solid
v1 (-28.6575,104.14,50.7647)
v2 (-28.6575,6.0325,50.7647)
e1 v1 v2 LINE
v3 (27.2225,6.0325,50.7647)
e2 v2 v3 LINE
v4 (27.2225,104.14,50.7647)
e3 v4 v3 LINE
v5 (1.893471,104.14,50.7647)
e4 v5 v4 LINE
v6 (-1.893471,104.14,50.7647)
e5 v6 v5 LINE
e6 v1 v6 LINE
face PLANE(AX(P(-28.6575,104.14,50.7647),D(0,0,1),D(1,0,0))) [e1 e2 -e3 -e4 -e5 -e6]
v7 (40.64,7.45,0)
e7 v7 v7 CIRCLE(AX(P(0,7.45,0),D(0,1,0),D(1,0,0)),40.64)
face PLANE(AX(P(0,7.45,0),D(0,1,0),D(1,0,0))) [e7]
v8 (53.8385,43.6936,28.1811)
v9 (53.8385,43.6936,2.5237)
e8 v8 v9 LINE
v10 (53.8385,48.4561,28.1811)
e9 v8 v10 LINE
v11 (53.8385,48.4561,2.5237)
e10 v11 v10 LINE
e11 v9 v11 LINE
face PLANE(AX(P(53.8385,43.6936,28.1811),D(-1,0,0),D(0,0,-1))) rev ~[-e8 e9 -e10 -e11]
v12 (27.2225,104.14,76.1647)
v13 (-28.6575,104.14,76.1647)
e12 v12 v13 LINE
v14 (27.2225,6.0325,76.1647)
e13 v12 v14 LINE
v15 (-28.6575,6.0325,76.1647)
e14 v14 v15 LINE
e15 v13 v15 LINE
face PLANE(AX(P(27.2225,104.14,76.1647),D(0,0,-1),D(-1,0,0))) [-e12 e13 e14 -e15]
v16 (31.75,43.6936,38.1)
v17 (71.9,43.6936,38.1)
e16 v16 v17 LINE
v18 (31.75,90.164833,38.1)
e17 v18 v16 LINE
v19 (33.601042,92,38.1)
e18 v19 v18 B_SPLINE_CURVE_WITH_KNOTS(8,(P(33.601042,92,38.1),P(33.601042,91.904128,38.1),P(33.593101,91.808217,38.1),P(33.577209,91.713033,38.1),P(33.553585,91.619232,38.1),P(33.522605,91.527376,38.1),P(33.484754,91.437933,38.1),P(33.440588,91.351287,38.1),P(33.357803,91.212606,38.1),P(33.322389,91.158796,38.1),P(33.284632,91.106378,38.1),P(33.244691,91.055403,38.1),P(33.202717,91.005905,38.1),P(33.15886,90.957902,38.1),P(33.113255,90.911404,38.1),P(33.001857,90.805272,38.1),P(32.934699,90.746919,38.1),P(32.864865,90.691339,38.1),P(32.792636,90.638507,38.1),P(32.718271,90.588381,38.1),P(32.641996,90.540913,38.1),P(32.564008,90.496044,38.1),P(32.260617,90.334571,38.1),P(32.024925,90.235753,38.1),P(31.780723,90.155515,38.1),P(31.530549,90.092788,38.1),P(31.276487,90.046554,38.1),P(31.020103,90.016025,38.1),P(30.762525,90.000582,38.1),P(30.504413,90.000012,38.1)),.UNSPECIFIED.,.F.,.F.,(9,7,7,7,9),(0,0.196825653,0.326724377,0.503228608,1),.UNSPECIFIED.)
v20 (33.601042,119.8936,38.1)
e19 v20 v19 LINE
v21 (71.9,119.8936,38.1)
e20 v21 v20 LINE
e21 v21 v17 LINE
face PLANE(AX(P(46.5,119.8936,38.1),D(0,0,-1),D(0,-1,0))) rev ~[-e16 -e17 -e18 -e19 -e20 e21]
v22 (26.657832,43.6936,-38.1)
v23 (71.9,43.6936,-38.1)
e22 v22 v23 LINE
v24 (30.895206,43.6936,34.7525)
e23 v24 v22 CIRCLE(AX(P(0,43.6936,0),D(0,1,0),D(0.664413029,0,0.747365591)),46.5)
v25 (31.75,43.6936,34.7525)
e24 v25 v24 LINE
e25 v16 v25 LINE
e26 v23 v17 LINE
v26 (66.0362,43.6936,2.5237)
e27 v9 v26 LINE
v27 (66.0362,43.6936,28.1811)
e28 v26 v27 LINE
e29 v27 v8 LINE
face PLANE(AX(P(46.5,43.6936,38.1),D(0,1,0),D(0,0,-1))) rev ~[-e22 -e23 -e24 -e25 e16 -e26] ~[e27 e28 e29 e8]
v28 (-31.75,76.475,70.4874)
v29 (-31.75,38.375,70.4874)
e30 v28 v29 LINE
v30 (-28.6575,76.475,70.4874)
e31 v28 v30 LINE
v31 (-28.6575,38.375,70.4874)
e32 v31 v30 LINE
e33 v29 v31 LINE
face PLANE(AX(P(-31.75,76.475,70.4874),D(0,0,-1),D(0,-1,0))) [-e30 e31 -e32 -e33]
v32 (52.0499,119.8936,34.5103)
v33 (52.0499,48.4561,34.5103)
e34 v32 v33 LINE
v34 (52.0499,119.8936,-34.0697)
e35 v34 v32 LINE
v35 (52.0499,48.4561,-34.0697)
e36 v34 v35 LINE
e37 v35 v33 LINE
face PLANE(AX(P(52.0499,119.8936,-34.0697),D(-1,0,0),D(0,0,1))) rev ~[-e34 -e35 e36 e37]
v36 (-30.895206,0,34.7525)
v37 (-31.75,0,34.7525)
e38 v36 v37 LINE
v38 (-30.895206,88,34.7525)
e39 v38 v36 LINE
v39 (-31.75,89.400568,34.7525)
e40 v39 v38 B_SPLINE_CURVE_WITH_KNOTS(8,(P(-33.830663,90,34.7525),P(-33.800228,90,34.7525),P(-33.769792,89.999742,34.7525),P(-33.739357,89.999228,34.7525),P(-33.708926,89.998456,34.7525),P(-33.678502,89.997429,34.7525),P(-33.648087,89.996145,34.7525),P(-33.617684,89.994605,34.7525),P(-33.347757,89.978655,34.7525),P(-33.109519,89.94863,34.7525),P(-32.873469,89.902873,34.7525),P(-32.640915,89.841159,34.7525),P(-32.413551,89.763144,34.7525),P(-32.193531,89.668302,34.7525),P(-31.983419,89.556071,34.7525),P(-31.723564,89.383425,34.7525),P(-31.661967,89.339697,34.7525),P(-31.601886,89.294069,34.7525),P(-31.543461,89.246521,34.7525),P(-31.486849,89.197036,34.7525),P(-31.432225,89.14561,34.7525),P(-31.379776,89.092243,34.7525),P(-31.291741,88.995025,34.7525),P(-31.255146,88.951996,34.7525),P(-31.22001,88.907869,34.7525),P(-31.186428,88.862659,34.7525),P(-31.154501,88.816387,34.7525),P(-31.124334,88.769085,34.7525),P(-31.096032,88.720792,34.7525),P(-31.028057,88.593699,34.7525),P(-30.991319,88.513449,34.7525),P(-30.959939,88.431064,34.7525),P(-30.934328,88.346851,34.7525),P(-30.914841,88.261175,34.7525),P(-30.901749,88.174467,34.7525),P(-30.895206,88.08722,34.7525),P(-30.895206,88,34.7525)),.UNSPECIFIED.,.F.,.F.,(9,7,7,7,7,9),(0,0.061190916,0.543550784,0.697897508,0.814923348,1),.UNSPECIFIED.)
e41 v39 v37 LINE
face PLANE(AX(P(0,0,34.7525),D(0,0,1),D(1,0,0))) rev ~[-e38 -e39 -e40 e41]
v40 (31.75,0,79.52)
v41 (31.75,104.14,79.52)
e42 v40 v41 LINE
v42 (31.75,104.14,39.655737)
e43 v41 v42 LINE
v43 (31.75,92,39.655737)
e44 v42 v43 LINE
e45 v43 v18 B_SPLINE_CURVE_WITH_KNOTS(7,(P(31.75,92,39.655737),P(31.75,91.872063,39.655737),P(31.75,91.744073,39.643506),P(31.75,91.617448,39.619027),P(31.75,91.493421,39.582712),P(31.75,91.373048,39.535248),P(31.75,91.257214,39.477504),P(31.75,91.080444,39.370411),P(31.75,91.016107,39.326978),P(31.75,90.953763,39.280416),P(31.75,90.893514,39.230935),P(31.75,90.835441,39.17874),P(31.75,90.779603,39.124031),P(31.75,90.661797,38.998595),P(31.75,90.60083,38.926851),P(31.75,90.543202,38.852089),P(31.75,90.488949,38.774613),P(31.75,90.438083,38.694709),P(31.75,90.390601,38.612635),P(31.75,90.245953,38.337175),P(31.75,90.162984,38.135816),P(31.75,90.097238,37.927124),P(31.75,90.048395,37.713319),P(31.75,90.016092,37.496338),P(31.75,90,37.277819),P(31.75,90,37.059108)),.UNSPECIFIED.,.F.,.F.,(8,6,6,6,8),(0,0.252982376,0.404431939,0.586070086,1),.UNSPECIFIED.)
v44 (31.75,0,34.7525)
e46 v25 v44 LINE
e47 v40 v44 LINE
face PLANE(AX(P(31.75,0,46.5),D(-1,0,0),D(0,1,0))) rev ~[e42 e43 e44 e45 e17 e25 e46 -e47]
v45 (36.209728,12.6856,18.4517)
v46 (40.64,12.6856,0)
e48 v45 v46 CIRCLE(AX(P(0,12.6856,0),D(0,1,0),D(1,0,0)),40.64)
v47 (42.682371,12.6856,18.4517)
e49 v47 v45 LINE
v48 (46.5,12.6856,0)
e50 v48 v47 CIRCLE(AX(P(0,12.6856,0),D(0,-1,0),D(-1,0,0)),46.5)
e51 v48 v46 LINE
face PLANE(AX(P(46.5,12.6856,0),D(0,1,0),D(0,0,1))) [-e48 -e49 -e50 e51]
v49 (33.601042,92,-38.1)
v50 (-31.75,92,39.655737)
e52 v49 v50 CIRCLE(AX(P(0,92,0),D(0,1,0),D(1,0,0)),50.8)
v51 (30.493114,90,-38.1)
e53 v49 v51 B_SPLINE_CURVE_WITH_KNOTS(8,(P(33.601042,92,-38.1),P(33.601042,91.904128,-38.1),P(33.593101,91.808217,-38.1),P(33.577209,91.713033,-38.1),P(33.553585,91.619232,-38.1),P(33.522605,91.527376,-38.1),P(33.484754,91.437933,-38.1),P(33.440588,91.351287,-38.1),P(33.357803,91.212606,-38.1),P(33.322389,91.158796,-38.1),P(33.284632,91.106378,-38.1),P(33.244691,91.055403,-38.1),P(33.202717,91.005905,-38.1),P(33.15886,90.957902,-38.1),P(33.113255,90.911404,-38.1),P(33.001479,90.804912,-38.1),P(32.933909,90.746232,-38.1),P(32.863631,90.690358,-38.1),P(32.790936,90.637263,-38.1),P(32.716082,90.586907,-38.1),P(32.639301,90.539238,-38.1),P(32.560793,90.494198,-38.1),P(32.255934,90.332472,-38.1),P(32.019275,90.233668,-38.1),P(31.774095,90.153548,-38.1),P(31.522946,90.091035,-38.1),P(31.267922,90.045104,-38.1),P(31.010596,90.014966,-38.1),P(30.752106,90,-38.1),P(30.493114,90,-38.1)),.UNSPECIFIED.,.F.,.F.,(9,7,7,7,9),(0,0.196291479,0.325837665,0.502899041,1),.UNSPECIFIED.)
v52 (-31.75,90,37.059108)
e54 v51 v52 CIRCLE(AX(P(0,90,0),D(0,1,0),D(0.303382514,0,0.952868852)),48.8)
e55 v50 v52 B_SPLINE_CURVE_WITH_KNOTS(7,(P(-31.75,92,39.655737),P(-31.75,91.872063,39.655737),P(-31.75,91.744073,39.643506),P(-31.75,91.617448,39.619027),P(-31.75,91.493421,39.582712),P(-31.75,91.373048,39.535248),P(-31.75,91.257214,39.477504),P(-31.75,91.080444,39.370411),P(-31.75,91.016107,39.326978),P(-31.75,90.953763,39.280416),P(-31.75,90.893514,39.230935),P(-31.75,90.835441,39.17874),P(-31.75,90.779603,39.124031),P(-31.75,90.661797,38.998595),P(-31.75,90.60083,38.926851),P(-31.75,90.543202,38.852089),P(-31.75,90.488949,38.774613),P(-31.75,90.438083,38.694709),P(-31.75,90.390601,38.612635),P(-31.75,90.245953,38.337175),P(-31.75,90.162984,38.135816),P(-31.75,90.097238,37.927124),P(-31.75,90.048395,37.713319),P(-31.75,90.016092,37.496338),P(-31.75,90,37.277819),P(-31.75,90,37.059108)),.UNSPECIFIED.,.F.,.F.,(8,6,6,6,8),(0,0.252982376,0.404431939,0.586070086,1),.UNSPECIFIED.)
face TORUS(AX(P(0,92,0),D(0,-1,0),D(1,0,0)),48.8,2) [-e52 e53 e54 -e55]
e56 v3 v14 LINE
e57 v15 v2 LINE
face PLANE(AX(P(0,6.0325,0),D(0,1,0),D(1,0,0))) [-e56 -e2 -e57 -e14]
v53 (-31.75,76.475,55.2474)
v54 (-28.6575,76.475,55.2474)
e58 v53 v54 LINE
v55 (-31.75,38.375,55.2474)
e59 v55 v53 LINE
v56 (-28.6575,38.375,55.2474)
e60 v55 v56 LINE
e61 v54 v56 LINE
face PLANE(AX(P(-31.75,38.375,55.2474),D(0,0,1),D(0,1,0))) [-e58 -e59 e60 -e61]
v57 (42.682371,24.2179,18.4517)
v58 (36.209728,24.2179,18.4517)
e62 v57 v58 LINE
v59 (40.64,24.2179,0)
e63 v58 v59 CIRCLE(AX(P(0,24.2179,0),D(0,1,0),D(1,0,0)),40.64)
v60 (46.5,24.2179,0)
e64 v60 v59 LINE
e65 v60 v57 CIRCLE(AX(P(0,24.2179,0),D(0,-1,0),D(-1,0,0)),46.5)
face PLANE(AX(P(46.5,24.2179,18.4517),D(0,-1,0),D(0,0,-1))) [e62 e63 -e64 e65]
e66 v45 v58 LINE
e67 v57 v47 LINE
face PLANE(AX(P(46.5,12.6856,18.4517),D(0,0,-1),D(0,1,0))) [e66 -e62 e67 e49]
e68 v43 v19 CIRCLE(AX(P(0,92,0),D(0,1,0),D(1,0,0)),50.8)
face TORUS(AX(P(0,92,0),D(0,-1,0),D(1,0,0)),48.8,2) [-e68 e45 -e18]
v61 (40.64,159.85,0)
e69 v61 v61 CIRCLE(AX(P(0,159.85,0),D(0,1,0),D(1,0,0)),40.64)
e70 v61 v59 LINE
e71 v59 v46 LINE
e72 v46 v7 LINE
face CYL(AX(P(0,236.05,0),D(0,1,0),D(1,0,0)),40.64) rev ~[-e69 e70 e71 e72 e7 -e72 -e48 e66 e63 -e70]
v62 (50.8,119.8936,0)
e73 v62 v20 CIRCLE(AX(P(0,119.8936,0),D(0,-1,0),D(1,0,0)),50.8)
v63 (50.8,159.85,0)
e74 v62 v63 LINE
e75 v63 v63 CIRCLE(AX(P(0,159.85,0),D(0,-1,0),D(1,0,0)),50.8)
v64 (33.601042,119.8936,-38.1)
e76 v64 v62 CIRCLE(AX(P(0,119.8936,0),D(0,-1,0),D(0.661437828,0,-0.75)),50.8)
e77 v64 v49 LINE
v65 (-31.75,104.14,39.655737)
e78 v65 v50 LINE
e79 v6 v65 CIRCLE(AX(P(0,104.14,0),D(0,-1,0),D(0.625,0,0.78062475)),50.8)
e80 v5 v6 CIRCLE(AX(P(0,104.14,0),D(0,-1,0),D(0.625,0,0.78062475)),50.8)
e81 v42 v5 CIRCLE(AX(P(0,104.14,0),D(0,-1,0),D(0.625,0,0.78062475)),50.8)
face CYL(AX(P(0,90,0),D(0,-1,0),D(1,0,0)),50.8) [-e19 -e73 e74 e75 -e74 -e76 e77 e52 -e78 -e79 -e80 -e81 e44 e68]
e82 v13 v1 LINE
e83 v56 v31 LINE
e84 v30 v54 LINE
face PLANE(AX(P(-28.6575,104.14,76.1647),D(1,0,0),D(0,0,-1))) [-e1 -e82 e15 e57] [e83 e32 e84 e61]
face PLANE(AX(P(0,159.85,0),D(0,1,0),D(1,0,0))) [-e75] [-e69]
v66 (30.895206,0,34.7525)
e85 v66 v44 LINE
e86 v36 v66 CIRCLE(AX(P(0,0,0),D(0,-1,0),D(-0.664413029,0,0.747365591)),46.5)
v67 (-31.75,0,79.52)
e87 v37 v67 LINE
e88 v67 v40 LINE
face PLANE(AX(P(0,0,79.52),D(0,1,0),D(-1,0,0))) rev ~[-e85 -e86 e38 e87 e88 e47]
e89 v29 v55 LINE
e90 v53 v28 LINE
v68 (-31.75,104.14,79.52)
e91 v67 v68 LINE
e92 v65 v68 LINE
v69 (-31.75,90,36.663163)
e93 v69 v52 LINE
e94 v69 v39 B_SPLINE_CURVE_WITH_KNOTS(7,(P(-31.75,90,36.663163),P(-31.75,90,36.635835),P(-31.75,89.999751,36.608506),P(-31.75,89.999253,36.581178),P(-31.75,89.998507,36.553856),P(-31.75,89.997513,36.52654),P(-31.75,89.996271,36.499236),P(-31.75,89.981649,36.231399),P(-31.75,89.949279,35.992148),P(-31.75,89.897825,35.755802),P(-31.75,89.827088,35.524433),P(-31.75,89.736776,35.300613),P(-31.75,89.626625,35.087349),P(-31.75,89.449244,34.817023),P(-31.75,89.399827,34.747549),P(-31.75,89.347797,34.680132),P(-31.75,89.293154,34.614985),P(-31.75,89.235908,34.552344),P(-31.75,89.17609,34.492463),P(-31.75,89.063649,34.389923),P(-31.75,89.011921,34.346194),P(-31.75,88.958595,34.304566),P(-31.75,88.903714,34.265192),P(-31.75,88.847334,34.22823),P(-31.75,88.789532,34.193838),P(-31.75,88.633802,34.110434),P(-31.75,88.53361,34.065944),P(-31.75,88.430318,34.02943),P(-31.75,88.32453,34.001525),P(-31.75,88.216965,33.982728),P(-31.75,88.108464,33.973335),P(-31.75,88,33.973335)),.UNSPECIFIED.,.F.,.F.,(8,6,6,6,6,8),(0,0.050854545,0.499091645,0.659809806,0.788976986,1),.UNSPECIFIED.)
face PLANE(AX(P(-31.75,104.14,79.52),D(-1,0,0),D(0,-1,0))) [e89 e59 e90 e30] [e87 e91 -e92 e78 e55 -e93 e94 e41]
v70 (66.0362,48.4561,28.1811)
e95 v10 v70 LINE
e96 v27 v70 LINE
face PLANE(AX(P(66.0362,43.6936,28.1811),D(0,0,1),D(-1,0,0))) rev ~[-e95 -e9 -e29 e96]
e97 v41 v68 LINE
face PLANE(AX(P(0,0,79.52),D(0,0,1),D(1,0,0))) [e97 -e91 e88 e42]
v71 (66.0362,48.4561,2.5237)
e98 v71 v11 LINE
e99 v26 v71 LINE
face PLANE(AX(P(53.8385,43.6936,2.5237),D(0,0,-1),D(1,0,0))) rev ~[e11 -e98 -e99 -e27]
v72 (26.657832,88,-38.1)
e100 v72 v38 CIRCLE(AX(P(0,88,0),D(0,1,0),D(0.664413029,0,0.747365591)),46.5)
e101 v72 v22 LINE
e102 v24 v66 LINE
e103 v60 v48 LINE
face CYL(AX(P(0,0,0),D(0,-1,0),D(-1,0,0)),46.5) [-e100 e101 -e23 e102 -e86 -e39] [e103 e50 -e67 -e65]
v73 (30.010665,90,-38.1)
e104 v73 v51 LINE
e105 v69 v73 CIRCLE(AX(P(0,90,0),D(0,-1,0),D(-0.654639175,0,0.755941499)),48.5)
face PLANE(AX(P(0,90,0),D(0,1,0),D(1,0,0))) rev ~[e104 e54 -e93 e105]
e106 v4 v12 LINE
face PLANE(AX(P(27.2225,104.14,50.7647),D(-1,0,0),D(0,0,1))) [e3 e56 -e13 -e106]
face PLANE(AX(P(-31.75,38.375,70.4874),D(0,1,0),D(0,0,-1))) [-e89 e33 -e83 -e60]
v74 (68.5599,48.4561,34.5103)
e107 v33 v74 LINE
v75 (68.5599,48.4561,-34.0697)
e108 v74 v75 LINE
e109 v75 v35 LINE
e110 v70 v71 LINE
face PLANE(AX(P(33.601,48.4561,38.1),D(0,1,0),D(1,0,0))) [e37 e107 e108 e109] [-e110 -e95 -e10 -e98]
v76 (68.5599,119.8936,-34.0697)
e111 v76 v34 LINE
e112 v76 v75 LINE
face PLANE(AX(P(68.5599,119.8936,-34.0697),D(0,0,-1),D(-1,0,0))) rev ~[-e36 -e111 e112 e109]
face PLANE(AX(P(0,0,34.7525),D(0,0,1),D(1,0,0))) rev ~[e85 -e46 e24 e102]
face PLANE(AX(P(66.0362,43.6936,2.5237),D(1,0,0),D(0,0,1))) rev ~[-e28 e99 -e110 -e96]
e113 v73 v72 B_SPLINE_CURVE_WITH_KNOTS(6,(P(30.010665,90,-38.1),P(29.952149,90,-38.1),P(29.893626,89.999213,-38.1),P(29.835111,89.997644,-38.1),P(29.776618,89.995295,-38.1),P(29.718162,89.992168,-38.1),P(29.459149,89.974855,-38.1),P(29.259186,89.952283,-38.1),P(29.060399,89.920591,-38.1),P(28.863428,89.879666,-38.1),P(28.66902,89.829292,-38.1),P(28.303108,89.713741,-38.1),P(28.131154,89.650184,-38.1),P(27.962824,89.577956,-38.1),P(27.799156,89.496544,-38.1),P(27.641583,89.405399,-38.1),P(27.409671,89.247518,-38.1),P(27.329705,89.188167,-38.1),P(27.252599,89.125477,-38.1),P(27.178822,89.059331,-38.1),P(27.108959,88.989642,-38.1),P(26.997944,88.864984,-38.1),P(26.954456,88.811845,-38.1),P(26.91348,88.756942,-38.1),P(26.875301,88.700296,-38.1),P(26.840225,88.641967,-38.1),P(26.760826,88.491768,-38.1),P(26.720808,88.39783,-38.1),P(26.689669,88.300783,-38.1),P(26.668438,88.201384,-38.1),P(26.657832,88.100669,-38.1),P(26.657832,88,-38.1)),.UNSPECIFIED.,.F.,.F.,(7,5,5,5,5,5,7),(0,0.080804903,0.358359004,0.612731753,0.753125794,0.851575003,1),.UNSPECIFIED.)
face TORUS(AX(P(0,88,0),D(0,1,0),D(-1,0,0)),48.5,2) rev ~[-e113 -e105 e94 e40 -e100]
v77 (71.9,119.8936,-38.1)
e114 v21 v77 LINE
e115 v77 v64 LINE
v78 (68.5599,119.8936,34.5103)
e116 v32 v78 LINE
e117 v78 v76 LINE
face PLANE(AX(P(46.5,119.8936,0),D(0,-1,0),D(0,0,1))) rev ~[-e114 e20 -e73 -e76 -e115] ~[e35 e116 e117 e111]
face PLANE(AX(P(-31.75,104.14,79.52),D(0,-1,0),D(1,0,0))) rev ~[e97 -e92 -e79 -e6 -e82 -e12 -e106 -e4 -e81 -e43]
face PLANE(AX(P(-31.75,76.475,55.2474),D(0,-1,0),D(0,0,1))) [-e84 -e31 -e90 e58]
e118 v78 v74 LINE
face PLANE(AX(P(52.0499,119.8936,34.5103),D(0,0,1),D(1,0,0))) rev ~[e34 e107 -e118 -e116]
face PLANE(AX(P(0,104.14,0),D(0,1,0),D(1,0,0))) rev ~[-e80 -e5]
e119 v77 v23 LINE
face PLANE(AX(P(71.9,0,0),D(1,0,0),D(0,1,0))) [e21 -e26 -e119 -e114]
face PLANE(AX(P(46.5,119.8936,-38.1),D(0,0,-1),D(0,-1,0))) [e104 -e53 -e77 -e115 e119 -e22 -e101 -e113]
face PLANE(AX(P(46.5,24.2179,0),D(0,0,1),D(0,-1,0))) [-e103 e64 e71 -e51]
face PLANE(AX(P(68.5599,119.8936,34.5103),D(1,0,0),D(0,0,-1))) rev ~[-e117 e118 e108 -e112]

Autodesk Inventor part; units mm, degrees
sketch "Sketch1" plane through (0, 0, 0) normal (0, 1, 0) x (-1, 0, 0)
  circle A0 centre (0, 0) radius 46.5
  dimension "d0" = 93
extrude "Extrusion1" add sketch "Sketch1" along normal blind 90
sketch "Sketch2" plane through (0, 90, 0) normal (0, 1, 0) x (1, 0, 0)
  circle A0 centre (0, 0) radius 50.8
  dimension "d3" = 101.6
extrude "Extrusion2" add sketch "Sketch2" along normal blind 146.05
sketch "Sketch4" plane through (0, 90, 0) normal (0, -1, 0) x (1, 0, 0)
  point P0 (0, 0)
sketch "Sketch5" plane through (0, 90, 0) normal (0, -1, 0) x (1, 0, 0)
  point P0 (0, 0)
sketch "Sketch6" plane through (0, 90, 0) normal (0, -1, 0) x (1, 0, 0)
  point P0 (0, 0)
fillet "Fillet1" radius 2 2 edges at (-50.8, 90, 0) (46.5, 90, 0)
ref_plane "Work Plane2" through (46.5, 0, 0) normal (1, 0, 0) x (0, 1, 0)
sketch "Sketch7" plane through (46.5, 0, 0) normal (1, 0, 0) x (0, 1, 0)
  line L0 (24.2179, 0) -> (12.6856, 0)
  line L1 (12.6856, 0) -> (12.6856, 18.4517)
  line L2 (12.6856, 18.4517) -> (24.2179, 18.4517)
  line L3 (24.2179, 18.4517) -> (24.2179, 0)
  point P0 (0, 0)
extrude "Extrusion4" cut sketch "Sketch7" against normal blind 17.4625
sketch "Sketch12" plane through (0, 90, 0) normal (0, -1, 0) x (1, 0, 0)
  point P0 (0, 0)
sketch "Sketch13" plane through (0, 90, 0) normal (0, -1, 0) x (1, 0, 0)
  point P0 (0, 0)
sketch "Sketch14" plane through (0, 90, 0) normal (0, -1, 0) x (1, 0, 0)
  line L0 (65.7696, 29.9336) -> (57.3376, 29.9336)
  line L1 (57.3376, 29.9336) -> (57.3376, 7.1672)
  line L2 (57.3376, 7.1672) -> (65.7696, 7.1672)
  line L3 (65.7696, 7.1672) -> (65.7696, 29.9336)
  point P0 (0, 0)
extrude "Extrusion8" cut sketch "Sketch14" against normal blind 141.605
ref_plane "Work Plane4" through (0, 0, 46.5) normal (0, 0, 1) x (1, 0, 0)
sketch "Sketch24" plane through (0, 0, 46.5) normal (0, 0, 1) x (1, 0, 0)
  point P0 (0, 0)
sketch "Sketch25" plane through (0, 0, 46.5) normal (0, 0, 1) x (1, 0, 0)
  line L0 (0, 0) -> (-31.75, 0)
  line L1 (-31.75, 0) -> (-31.75, 104.14)
  line L2 (-31.75, 104.14) -> (0, 104.14)
  line L3 (0, 104.14) -> (0, 0)
  line L4 (0, 0) -> (31.75, 0)
  line L5 (31.75, 0) -> (31.75, 104.14)
  line L6 (31.75, 104.14) -> (0, 104.14)
  line L7 (0, 104.14) -> (0, 0)
  dimension "d59" = 31.75
  dimension "d60" = 104.14
  dimension "d61" = 31.75
  dimension "d62" = 104.14
extrude "Extrusion13" add sketch "Sketch25" along normal blind 33.02
sketch "Sketch26" plane through (0, 0, 79.52) normal (0, 0, 1) x (1, 0, 0)
  line L0 (-31.75, 104.14) -> (-31.75, 0) projected
  line L1 (0, 0) -> (31.75, 0) projected
  line L2 (-31.75, 104.14) -> (31.75, 104.14)
  line L3 (31.75, 104.14) -> (31.75, 0)
  line L4 (31.75, 0) -> (-31.75, 0)
  line L5 (-31.75, 0) -> (-31.75, 104.14)
extrude "Extrusion14" add sketch "Sketch26" against normal blind 44.7675
sketch "Sketch27" plane through (0, 104.14, 0) normal (0, 1, 0) x (1, 0, 0)
  point P0 (0, 0)
sketch "Sketch28" plane through (0, 104.14, 0) normal (0, 1, 0) x (1, 0, 0)
  point P0 (0, 0)
sketch "Sketch29" plane through (0, 104.14, 0) normal (0, 1, 0) x (1, 0, 0)
  line L0 (-28.6575, -50.7647) -> (27.2225, -50.7647)
  line L1 (27.2225, -50.7647) -> (27.2225, -76.1647)
  line L2 (27.2225, -76.1647) -> (-28.6575, -76.1647)
  line L3 (-28.6575, -76.1647) -> (-28.6575, -50.7647)
  point P0 (0, 0)
  dimension "d67" = 55.88
  dimension "d68" = 25.4
extrude "Extrusion15" cut sketch "Sketch29" against normal blind 98.1075
sketch "Sketch30" plane through (-31.75, 0, 79.52) normal (-1, 0, 0) x (0, 0, 1)
  line L0 (-0.5043, 102.352) -> (0, 76.957)
  line L1 (0, 0) -> (0, 104.14) projected
  line L2 (-24.2726, 76.475) -> (-9.0326, 76.475)
  line L3 (-9.0326, 76.475) -> (-9.0326, 38.375)
  line L4 (-9.0326, 38.375) -> (-24.2726, 38.375)
  line L5 (-24.2726, 38.375) -> (-24.2726, 76.475)
  point P0 (-79.52, 0)
  dimension "d71" = 25.4
  dimension "d72" = 15.24
  dimension "d73" = 38.1
extrude "Extrusion16" cut sketch "Sketch30" against normal blind 46.355
ref_plane "Work Plane5" through (46.5, 0, 0) normal (1, 0, 0) x (0, 1, 0)
sketch "Sketch31" plane through (46.5, 0, 0) normal (1, 0, 0) x (0, 1, 0)
  line L0 (11.9436, 0) -> (43.6936, 0)
  line L1 (43.6936, 0) -> (119.8936, 0)
  line L2 (119.8936, 0) -> (119.8936, 38.1)
  line L3 (119.8936, 38.1) -> (43.6936, 38.1)
  line L4 (43.6936, 38.1) -> (43.6936, 0)
  line L5 (43.6936, 0) -> (119.8936, 0)
  line L6 (119.8936, 0) -> (119.8936, -38.1)
  line L7 (119.8936, -38.1) -> (43.6936, -38.1)
  line L8 (43.6936, -38.1) -> (43.6936, 0)
  point P0 (0, 0)
  dimension "d76" = 31.75
  dimension "d77" = 76.2
  dimension "d78" = 38.1
  dimension "d79" = 76.2
  dimension "d80" = 38.1
extrude "Extrusion17" add sketch "Sketch31" along normal blind 25.4
sketch "Sketch32" plane through (71.9, 0, 0) normal (1, 0, 0) x (0, 0, -1)
  point P0 (0, 0)
sketch "Sketch33" plane through (71.9, 0, 0) normal (1, 0, 0) x (0, 0, -1)
  line L0 (-20.4546, 119.8936) -> (-38.1, 119.8936) projected
  line L1 (0, 43.6936) -> (38.1, 43.6936) projected
  line L2 (-38.1, 119.8936) -> (38.1, 119.8936)
  line L3 (38.1, 119.8936) -> (38.1, 43.6936)
  line L4 (38.1, 43.6936) -> (-38.1, 43.6936)
  line L5 (-38.1, 43.6936) -> (-38.1, 119.8936)
  point P0 (0, 0)
extrude "Extrusion18" add sketch "Sketch33" against normal blind 47.625
sketch "Sketch3" plane through (0, 236.05, 0) normal (0, 1, 0) x (1, 0, 0)
  circle A0 centre (0, 0) radius 40.64
  dimension "d6" = 81.28
extrude "Extrusion3" cut sketch "Sketch3" against normal blind 228.6
sketch "Sketch34" plane through (33.601, 119.8936, 38.1) normal (0, 1, 0) x (1, 0, 0)
  line L0 (34.9589, 72.1697) -> (18.4489, 72.1697)
  line L1 (18.4489, 72.1697) -> (18.4489, 3.5897)
  line L2 (18.4489, 3.5897) -> (34.9589, 3.5897)
  line L3 (34.9589, 3.5897) -> (34.9589, 72.1697)
  point P0 (-33.601, 38.1)
  dimension "d85" = 16.51
  dimension "d86" = 68.58
extrude "Extrusion19" cut sketch "Sketch34" against normal blind 71.4375
sketch "Sketch35" plane through (26.6578, 43.6936, -38.1) normal (0, -1, 0) x (1, 0, 0)
  point P0 (-26.6578, 38.1)
sketch "Sketch36" plane through (26.6578, 43.6936, -38.1) normal (0, -1, 0) x (1, 0, 0)
  line L0 (39.3784, 66.2811) -> (27.1807, 66.2811)
  line L1 (27.1807, 66.2811) -> (27.1807, 40.6237)
  line L2 (27.1807, 40.6237) -> (39.3784, 40.6237)
  line L3 (39.3784, 40.6237) -> (39.3784, 66.2811)
  point P0 (-26.6578, 38.1)
extrude "Extrusion20" cut sketch "Sketch36" against normal blind 71.4375
sketch "Sketch37" plane through (0, 236.05, 0) normal (0, 1, 0) x (1, 0, 0)
  circle A0 centre (0, 0) radius 58.234
extrude "Extrusion21" cut sketch "Sketch37" against normal blind 76.2
properties part number "_3DPrint"
